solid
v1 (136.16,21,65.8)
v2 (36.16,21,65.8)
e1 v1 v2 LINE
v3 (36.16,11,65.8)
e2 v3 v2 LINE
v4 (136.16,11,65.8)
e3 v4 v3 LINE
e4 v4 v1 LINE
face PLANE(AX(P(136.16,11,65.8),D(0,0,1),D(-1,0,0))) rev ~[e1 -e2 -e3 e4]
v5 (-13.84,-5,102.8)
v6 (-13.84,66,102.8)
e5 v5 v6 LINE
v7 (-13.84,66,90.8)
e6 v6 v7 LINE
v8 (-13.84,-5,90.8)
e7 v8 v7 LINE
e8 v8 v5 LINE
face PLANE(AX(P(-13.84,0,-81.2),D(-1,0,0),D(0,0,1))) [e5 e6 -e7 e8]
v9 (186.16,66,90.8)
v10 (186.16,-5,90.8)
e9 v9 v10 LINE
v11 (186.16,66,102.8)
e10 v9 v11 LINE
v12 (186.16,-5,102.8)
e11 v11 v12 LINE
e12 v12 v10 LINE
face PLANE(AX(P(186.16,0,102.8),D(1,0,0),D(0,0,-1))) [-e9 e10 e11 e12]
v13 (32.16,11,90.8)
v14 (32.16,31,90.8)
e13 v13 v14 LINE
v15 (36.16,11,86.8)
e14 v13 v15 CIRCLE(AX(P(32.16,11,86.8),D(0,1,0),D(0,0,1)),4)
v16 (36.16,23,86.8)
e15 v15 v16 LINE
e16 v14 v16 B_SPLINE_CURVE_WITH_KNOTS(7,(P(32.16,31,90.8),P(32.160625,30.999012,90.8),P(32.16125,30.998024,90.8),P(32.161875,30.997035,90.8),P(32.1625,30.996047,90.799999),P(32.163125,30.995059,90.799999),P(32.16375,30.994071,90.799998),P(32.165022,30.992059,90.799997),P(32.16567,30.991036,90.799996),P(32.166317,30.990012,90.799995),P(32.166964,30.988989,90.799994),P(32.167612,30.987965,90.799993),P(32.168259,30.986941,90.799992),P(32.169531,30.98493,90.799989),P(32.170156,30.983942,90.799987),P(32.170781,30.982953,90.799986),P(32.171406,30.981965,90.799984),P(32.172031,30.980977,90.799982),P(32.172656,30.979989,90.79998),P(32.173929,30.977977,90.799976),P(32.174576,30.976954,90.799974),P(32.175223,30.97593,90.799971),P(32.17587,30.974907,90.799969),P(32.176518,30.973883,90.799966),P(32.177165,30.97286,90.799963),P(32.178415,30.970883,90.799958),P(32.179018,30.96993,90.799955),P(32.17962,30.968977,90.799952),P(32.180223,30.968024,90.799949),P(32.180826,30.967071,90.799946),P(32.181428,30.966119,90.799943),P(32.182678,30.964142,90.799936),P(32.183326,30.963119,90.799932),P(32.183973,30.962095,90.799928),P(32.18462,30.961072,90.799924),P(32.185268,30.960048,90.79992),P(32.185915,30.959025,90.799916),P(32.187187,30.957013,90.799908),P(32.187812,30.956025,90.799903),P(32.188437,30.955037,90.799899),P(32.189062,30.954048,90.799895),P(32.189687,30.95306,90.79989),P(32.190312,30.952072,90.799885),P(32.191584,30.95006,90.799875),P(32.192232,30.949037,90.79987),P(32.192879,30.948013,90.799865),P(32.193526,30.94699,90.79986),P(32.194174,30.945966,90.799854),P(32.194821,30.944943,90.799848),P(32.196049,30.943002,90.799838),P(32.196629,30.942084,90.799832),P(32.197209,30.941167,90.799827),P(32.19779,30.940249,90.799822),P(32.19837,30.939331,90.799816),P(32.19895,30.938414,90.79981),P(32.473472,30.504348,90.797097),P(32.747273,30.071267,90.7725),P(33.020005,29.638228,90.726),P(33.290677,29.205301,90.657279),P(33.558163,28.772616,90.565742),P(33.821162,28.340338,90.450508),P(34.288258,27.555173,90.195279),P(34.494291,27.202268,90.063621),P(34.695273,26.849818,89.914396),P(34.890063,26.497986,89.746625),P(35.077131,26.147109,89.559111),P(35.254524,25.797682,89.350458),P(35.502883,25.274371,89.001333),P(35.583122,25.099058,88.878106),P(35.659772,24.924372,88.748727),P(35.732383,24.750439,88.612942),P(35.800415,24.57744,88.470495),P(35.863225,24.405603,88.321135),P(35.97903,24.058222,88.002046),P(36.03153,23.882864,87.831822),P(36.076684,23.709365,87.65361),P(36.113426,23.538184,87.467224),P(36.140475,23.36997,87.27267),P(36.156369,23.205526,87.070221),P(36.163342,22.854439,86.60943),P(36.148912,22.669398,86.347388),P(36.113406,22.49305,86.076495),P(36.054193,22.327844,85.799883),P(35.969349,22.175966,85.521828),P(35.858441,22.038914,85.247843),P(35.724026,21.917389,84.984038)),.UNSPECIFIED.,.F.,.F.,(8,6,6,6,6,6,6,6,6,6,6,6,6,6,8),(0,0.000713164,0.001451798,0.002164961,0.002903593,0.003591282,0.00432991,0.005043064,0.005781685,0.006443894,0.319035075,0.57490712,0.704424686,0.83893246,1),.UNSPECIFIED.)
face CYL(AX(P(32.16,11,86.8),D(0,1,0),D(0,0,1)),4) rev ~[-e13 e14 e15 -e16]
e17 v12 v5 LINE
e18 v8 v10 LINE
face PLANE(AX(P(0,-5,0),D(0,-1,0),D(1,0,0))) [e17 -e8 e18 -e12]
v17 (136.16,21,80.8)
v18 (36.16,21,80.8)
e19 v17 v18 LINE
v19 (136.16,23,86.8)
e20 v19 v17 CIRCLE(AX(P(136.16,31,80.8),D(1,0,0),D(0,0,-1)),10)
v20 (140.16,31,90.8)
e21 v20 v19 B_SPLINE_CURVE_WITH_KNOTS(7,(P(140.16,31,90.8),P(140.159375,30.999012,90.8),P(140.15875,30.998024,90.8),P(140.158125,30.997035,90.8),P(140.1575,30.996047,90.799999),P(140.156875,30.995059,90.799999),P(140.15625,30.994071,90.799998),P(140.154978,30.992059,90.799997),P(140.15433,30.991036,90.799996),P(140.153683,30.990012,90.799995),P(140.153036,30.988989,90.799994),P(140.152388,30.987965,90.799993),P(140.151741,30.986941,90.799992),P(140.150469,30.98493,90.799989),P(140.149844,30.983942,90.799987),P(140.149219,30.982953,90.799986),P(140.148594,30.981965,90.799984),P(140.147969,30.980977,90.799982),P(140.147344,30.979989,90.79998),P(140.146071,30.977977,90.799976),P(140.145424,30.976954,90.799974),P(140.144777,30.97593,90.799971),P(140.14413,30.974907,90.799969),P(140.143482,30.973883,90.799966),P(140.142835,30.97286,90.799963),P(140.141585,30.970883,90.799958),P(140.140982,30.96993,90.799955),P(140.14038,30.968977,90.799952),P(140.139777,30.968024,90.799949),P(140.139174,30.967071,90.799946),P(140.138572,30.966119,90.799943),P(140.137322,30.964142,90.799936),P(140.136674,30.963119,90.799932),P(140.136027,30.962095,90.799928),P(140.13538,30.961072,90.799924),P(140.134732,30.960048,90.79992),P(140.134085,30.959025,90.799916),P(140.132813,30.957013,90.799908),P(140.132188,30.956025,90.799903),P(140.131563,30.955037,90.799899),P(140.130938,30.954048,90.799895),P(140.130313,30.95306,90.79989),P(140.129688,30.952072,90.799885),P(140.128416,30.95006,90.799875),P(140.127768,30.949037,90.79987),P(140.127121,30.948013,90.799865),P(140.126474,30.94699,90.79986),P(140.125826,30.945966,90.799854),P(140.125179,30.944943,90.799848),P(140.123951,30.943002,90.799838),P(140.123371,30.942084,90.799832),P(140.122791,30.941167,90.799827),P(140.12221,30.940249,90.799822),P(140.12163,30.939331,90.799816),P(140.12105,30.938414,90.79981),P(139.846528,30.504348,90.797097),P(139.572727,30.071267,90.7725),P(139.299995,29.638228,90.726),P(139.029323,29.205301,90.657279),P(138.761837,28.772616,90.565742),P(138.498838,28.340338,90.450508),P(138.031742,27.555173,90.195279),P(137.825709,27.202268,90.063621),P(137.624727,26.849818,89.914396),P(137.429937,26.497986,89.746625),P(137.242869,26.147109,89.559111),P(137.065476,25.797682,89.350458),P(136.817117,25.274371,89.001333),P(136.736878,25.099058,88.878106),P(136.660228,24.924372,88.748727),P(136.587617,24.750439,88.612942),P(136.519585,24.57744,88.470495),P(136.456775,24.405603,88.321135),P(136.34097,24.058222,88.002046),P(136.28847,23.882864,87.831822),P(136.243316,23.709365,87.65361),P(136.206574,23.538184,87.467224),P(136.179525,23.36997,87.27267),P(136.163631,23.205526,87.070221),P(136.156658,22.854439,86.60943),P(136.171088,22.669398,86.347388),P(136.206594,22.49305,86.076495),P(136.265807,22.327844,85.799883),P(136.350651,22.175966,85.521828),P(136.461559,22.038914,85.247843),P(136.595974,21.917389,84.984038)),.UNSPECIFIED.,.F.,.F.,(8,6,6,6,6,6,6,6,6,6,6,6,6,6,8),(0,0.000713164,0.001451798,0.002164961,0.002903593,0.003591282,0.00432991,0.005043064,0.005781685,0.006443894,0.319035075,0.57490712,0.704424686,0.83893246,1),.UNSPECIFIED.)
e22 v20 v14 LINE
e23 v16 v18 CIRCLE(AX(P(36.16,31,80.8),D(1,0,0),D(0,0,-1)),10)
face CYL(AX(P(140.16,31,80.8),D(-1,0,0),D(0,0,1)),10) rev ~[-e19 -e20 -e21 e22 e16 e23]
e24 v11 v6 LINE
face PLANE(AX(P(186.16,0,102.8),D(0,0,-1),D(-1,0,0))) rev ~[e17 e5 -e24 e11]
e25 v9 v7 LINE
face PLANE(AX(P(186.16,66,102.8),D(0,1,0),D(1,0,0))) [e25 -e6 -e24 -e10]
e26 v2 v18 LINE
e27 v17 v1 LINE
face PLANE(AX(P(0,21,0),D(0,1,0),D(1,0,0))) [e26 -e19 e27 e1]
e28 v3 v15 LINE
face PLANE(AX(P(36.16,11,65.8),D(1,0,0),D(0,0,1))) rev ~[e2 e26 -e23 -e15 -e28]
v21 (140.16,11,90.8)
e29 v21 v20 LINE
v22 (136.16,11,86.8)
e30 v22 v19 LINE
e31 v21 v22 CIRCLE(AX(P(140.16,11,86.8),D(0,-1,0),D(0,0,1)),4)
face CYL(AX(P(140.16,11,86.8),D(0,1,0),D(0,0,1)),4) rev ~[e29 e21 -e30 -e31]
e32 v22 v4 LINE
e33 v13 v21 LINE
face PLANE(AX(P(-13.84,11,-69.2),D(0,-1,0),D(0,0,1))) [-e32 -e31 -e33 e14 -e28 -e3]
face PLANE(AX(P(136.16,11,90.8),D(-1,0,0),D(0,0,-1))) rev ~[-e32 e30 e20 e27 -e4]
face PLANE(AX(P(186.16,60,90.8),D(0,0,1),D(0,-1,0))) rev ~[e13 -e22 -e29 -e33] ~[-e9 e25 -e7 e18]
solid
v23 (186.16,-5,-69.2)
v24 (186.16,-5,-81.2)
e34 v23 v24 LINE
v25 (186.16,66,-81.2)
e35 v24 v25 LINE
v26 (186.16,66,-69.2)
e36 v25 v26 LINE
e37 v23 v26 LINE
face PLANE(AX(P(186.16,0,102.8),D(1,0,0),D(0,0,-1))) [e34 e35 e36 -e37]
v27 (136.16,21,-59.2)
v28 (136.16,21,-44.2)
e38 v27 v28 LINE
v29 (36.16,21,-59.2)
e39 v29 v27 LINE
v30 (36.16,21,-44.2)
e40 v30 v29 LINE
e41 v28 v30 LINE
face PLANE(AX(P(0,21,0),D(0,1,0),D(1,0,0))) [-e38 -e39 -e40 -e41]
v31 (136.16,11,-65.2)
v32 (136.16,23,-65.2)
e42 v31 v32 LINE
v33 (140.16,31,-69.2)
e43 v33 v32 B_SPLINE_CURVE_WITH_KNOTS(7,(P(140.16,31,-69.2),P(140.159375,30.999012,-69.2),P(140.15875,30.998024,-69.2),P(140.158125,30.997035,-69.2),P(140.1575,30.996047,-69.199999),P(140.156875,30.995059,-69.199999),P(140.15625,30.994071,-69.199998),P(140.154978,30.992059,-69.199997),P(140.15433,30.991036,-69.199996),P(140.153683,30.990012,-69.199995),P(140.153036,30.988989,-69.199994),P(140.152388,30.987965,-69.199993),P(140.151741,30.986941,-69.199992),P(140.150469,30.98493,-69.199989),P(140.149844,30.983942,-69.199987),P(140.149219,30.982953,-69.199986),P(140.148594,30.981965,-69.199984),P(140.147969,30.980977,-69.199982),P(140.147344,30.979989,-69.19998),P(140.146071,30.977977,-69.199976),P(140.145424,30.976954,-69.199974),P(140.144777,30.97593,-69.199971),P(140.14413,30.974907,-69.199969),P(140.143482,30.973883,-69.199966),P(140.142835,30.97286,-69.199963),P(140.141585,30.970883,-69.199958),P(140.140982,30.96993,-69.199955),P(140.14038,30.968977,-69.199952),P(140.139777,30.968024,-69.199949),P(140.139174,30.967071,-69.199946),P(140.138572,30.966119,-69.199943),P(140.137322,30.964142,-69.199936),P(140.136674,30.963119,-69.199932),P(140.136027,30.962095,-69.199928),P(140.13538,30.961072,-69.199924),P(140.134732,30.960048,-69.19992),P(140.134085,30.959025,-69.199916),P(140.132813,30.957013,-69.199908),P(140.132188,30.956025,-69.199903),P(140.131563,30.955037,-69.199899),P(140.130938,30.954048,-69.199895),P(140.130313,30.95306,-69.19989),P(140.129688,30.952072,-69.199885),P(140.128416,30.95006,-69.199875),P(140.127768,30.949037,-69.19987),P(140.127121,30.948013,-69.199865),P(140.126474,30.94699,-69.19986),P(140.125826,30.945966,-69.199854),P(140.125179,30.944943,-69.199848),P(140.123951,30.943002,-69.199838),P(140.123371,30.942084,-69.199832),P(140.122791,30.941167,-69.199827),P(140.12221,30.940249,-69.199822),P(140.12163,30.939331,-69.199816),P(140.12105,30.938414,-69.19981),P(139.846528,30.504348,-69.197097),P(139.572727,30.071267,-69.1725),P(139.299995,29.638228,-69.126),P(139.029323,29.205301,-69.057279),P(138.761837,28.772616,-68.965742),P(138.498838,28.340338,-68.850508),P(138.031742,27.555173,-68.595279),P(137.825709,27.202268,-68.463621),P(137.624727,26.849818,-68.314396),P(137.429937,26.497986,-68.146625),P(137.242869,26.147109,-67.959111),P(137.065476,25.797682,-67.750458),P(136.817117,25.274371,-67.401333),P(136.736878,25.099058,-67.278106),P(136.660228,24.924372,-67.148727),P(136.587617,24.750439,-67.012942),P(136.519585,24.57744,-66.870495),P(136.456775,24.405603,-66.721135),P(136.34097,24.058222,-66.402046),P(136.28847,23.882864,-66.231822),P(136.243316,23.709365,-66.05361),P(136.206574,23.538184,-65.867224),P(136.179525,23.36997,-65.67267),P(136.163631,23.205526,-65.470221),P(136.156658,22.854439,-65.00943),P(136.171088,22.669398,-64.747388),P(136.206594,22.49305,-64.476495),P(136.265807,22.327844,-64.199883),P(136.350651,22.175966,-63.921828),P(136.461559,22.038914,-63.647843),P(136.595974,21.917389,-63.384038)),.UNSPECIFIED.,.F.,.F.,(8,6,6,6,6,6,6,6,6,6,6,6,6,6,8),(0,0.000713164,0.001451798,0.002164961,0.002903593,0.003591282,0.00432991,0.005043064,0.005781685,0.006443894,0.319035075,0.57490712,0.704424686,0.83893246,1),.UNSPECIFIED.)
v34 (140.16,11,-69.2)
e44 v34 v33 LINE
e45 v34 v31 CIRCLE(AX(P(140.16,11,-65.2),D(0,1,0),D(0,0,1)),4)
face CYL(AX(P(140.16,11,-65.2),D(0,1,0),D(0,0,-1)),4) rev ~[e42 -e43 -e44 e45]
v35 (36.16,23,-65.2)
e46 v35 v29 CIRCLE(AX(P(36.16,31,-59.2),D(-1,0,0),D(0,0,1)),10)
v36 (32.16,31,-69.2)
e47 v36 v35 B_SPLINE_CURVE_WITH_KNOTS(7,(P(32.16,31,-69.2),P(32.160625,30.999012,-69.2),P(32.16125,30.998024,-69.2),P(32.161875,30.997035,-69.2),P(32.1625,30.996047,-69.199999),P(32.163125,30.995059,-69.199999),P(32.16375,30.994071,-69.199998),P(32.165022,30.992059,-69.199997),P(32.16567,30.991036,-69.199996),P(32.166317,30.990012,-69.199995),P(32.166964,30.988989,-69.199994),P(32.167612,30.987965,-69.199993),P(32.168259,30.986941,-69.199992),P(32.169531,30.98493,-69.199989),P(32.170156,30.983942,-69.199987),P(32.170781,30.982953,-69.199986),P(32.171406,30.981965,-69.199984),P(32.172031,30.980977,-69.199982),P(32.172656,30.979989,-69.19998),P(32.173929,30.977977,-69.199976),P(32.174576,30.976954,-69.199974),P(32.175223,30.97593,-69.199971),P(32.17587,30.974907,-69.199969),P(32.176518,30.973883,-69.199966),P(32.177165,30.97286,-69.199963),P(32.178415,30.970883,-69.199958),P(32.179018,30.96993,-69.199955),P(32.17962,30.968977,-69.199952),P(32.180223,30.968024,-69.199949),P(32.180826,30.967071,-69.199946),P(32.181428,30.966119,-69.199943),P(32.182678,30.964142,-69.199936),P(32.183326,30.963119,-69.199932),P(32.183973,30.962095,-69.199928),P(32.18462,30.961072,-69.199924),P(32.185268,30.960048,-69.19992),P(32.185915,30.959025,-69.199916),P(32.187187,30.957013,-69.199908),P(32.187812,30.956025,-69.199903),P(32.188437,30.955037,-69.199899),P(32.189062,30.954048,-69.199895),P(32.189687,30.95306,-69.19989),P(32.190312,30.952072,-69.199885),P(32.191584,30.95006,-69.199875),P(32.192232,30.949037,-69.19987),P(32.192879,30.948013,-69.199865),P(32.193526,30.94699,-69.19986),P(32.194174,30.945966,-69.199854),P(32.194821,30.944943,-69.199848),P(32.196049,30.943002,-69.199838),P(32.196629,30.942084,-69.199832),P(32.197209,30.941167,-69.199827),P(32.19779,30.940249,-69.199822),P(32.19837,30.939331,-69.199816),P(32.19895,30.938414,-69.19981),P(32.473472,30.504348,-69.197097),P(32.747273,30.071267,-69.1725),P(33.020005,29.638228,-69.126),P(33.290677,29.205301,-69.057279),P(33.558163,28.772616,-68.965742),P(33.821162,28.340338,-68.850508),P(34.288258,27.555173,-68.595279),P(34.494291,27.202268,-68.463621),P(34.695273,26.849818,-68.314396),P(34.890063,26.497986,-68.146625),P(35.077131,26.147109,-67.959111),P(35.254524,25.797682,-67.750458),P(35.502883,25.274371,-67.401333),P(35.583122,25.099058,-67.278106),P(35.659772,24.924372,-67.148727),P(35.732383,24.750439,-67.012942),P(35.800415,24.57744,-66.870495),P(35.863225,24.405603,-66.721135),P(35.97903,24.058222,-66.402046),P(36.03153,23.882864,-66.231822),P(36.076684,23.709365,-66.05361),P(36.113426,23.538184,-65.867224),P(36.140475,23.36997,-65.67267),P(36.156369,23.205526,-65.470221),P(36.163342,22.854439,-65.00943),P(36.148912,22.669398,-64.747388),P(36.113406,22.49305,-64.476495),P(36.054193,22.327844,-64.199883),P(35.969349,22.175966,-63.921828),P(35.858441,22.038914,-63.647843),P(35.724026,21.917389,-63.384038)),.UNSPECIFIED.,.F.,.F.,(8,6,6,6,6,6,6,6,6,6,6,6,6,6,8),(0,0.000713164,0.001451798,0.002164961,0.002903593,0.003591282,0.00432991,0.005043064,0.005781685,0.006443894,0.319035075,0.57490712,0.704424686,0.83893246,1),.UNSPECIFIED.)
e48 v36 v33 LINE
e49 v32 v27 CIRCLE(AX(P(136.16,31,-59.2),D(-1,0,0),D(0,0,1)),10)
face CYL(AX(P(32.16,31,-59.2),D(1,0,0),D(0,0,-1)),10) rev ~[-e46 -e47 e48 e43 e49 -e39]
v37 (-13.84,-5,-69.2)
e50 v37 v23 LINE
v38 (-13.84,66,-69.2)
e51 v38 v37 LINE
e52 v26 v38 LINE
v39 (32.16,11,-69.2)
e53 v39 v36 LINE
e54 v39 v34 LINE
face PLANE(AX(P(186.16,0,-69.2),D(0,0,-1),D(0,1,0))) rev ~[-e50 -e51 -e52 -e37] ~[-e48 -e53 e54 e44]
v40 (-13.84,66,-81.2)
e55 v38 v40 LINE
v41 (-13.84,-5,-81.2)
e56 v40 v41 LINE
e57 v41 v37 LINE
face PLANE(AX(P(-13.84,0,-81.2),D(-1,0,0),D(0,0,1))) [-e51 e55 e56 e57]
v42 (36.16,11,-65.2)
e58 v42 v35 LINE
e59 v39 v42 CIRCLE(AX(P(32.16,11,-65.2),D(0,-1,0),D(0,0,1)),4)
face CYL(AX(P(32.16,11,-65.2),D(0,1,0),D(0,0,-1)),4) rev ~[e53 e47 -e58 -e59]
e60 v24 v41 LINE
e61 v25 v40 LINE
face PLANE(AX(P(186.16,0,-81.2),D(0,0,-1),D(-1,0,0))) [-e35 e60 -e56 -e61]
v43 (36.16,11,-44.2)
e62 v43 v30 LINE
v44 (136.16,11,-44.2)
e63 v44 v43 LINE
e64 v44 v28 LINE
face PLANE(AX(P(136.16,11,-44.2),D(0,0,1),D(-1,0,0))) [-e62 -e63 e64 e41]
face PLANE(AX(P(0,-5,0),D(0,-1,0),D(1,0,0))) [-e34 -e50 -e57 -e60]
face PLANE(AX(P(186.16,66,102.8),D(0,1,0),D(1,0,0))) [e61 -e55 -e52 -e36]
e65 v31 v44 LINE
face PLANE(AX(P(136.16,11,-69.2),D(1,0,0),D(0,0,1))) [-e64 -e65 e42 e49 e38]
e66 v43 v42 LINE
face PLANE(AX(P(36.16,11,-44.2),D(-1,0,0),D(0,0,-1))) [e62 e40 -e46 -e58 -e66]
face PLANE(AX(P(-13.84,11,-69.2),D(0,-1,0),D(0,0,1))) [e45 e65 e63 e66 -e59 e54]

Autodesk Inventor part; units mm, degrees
ref_plane "YZ Plane" through (0, 0, 0) normal (1, 0, 0) x (0, 1, 0)
ref_plane "XZ Plane" through (0, 0, 0) normal (0, 1, 0) x (-1, 0, 0)
ref_plane "XY Plane" through (0, 0, 0) normal (0, 0, 1) x (1, 0, 0)
sketch "Sketch1" plane through (0, 0, 0) normal (0, 1, 0) x (-1, 0, 0)
  line L0 (13.84, 90.8) -> (-186.16, 90.8)
  line L1 (-186.16, 90.8) -> (-186.16, -69.2)
  line L2 (-186.16, -69.2) -> (13.84, -69.2)
  line L3 (13.84, -69.2) -> (13.84, 90.8)
  point P0 (0, 0)
  dimension "d0" = 160
  dimension "d1" = 200
extrude "Extrusion1" add sketch "Sketch1" along normal blind 11
sketch "Sketch2" plane through (186.16, 0, 90.8) normal (1, 0, 0) x (0, 0, -1)
  line L0 (0, 0) -> (0, 11) projected
  line L1 (0, 0) -> (-12, 0)
  line L2 (-12, 0) -> (-12, 60)
  line L3 (-12, 60) -> (0, 60)
  line L4 (0, 60) -> (0, 0)
  line L5 (160, 0) -> (160, 11) projected
  line L6 (160, 0) -> (172, 0)
  line L7 (172, 0) -> (172, 60)
  line L8 (172, 60) -> (160, 60)
  line L9 (160, 60) -> (160, 0)
  point P0 (90.8, 0)
  point P1 (0, 11)
  dimension "d4" = 60
  dimension "d5" = 60
  dimension "d6" = 12
  dimension "d17" = 12
extrude "Extrusion2" add sketch "Sketch2" against normal up to surface (200 mm away)
sketch "Sketch3" plane through (0, 0, 0) normal (0, -1, 0) x (1, 0, 0)
  line L0 (186.16, 102.8) -> (186.16, -81.2) projected
  line L1 (186.16, 102.8) -> (-13.84, 102.8) projected
  line L2 (-13.84, -81.2) -> (-13.84, 102.8) projected
  line L3 (186.16, -81.2) -> (-13.84, -81.2) projected
  point P0 (0, 0)
extrude "Extrusion3" add sketch "Sketch3" along normal blind 5
sketch "Sketch7" plane through (0, 11, 0) normal (0, 1, 0) x (1, 0, 0)
  line L0 (186.16, -90.8) -> (-13.84, -90.8) projected
  line L1 (36.16, -90.8) -> (136.16, -90.8)
  line L2 (136.16, -90.8) -> (136.16, -65.8)
  line L3 (136.16, -65.8) -> (36.16, -65.8)
  line L4 (36.16, -65.8) -> (36.16, -90.8)
  line L5 (186.16, 69.2) -> (-13.84, 69.2) projected
  line L6 (36.16, 69.2) -> (136.16, 69.2)
  line L7 (136.16, 69.2) -> (136.16, 44.2)
  line L8 (136.16, 44.2) -> (36.16, 44.2)
  line L9 (36.16, 44.2) -> (36.16, 69.2)
  line L10 (-13.84, 69.2) -> (-13.84, -90.8) projected
  line L11 (186.16, -90.8) -> (186.16, 69.2) projected
  point P0 (0, 0)
  point P1 (136.16, 56.7)
  dimension "d18" = 25
  dimension "d19" = 25
  dimension "d20" = 50
  dimension "d21" = 50
  dimension "d22" = 50
  dimension "d23" = 50
extrude "Extrusion6" add sketch "Sketch7" along normal blind 10 contours L0 L4 L3 L2 | L7 L8 L9 L5
fillet "Fillet1" radius 4 4 edges at (36.16, 16, -69.2) (36.16, 16, 90.8) (136.16, 16, -69.2) (136.16, 16, 90.8)
fillet "Fillet2" radius 10 4 edges at (138.16, 21, -69.2) (34.16, 21, -69.2) (34.16, 21, 90.8) (138.16, 21, 90.8)
sketch "Sketch8" plane through (-13.84, 11, 90.8) normal (-1, 0, 0) x (0, 0, 1)
  line L0 (-160, 0) -> (0, 0)
  line L1 (0, 0) -> (0, -19)
  line L2 (0, -19) -> (-160, -19)
  line L3 (-160, -19) -> (-160, 0)
  line L4 (-172, 49) -> (12, 49)
  line L5 (12, 49) -> (12, -16)
  line L6 (12, -16) -> (-172, -16)
  line L7 (-172, -16) -> (-172, 49)
  point P0 (-90.8, -11)
  point P1 (-160, -16)
  point P2 (0, -16)
extrude "Extrusion7" cut sketch "Sketch8" against normal blind 1000 contours L0 L1 L6 L3
sketch "Sketch10" plane through (186.16, 60, 102.8) normal (0, 1, 0) x (1, 0, 0)
  line L0 (-200, 0) -> (-200, 12) projected
  line L1 (0, 0) -> (-200, 0) projected
  line L2 (0, 12) -> (0, 0) projected
  line L3 (0, 12) -> (-200, 12) projected
  line L4 (-200, 172) -> (-200, 184) projected
  line L5 (0, 172) -> (-200, 172) projected
  line L6 (0, 184) -> (0, 172) projected
  line L7 (0, 184) -> (-200, 184) projected
  point P0 (-186.16, 102.8)
extrude "Extrusion8" add sketch "Sketch10" along normal blind 6
properties part number "Y_karetka" material "Aluminum 6061"
